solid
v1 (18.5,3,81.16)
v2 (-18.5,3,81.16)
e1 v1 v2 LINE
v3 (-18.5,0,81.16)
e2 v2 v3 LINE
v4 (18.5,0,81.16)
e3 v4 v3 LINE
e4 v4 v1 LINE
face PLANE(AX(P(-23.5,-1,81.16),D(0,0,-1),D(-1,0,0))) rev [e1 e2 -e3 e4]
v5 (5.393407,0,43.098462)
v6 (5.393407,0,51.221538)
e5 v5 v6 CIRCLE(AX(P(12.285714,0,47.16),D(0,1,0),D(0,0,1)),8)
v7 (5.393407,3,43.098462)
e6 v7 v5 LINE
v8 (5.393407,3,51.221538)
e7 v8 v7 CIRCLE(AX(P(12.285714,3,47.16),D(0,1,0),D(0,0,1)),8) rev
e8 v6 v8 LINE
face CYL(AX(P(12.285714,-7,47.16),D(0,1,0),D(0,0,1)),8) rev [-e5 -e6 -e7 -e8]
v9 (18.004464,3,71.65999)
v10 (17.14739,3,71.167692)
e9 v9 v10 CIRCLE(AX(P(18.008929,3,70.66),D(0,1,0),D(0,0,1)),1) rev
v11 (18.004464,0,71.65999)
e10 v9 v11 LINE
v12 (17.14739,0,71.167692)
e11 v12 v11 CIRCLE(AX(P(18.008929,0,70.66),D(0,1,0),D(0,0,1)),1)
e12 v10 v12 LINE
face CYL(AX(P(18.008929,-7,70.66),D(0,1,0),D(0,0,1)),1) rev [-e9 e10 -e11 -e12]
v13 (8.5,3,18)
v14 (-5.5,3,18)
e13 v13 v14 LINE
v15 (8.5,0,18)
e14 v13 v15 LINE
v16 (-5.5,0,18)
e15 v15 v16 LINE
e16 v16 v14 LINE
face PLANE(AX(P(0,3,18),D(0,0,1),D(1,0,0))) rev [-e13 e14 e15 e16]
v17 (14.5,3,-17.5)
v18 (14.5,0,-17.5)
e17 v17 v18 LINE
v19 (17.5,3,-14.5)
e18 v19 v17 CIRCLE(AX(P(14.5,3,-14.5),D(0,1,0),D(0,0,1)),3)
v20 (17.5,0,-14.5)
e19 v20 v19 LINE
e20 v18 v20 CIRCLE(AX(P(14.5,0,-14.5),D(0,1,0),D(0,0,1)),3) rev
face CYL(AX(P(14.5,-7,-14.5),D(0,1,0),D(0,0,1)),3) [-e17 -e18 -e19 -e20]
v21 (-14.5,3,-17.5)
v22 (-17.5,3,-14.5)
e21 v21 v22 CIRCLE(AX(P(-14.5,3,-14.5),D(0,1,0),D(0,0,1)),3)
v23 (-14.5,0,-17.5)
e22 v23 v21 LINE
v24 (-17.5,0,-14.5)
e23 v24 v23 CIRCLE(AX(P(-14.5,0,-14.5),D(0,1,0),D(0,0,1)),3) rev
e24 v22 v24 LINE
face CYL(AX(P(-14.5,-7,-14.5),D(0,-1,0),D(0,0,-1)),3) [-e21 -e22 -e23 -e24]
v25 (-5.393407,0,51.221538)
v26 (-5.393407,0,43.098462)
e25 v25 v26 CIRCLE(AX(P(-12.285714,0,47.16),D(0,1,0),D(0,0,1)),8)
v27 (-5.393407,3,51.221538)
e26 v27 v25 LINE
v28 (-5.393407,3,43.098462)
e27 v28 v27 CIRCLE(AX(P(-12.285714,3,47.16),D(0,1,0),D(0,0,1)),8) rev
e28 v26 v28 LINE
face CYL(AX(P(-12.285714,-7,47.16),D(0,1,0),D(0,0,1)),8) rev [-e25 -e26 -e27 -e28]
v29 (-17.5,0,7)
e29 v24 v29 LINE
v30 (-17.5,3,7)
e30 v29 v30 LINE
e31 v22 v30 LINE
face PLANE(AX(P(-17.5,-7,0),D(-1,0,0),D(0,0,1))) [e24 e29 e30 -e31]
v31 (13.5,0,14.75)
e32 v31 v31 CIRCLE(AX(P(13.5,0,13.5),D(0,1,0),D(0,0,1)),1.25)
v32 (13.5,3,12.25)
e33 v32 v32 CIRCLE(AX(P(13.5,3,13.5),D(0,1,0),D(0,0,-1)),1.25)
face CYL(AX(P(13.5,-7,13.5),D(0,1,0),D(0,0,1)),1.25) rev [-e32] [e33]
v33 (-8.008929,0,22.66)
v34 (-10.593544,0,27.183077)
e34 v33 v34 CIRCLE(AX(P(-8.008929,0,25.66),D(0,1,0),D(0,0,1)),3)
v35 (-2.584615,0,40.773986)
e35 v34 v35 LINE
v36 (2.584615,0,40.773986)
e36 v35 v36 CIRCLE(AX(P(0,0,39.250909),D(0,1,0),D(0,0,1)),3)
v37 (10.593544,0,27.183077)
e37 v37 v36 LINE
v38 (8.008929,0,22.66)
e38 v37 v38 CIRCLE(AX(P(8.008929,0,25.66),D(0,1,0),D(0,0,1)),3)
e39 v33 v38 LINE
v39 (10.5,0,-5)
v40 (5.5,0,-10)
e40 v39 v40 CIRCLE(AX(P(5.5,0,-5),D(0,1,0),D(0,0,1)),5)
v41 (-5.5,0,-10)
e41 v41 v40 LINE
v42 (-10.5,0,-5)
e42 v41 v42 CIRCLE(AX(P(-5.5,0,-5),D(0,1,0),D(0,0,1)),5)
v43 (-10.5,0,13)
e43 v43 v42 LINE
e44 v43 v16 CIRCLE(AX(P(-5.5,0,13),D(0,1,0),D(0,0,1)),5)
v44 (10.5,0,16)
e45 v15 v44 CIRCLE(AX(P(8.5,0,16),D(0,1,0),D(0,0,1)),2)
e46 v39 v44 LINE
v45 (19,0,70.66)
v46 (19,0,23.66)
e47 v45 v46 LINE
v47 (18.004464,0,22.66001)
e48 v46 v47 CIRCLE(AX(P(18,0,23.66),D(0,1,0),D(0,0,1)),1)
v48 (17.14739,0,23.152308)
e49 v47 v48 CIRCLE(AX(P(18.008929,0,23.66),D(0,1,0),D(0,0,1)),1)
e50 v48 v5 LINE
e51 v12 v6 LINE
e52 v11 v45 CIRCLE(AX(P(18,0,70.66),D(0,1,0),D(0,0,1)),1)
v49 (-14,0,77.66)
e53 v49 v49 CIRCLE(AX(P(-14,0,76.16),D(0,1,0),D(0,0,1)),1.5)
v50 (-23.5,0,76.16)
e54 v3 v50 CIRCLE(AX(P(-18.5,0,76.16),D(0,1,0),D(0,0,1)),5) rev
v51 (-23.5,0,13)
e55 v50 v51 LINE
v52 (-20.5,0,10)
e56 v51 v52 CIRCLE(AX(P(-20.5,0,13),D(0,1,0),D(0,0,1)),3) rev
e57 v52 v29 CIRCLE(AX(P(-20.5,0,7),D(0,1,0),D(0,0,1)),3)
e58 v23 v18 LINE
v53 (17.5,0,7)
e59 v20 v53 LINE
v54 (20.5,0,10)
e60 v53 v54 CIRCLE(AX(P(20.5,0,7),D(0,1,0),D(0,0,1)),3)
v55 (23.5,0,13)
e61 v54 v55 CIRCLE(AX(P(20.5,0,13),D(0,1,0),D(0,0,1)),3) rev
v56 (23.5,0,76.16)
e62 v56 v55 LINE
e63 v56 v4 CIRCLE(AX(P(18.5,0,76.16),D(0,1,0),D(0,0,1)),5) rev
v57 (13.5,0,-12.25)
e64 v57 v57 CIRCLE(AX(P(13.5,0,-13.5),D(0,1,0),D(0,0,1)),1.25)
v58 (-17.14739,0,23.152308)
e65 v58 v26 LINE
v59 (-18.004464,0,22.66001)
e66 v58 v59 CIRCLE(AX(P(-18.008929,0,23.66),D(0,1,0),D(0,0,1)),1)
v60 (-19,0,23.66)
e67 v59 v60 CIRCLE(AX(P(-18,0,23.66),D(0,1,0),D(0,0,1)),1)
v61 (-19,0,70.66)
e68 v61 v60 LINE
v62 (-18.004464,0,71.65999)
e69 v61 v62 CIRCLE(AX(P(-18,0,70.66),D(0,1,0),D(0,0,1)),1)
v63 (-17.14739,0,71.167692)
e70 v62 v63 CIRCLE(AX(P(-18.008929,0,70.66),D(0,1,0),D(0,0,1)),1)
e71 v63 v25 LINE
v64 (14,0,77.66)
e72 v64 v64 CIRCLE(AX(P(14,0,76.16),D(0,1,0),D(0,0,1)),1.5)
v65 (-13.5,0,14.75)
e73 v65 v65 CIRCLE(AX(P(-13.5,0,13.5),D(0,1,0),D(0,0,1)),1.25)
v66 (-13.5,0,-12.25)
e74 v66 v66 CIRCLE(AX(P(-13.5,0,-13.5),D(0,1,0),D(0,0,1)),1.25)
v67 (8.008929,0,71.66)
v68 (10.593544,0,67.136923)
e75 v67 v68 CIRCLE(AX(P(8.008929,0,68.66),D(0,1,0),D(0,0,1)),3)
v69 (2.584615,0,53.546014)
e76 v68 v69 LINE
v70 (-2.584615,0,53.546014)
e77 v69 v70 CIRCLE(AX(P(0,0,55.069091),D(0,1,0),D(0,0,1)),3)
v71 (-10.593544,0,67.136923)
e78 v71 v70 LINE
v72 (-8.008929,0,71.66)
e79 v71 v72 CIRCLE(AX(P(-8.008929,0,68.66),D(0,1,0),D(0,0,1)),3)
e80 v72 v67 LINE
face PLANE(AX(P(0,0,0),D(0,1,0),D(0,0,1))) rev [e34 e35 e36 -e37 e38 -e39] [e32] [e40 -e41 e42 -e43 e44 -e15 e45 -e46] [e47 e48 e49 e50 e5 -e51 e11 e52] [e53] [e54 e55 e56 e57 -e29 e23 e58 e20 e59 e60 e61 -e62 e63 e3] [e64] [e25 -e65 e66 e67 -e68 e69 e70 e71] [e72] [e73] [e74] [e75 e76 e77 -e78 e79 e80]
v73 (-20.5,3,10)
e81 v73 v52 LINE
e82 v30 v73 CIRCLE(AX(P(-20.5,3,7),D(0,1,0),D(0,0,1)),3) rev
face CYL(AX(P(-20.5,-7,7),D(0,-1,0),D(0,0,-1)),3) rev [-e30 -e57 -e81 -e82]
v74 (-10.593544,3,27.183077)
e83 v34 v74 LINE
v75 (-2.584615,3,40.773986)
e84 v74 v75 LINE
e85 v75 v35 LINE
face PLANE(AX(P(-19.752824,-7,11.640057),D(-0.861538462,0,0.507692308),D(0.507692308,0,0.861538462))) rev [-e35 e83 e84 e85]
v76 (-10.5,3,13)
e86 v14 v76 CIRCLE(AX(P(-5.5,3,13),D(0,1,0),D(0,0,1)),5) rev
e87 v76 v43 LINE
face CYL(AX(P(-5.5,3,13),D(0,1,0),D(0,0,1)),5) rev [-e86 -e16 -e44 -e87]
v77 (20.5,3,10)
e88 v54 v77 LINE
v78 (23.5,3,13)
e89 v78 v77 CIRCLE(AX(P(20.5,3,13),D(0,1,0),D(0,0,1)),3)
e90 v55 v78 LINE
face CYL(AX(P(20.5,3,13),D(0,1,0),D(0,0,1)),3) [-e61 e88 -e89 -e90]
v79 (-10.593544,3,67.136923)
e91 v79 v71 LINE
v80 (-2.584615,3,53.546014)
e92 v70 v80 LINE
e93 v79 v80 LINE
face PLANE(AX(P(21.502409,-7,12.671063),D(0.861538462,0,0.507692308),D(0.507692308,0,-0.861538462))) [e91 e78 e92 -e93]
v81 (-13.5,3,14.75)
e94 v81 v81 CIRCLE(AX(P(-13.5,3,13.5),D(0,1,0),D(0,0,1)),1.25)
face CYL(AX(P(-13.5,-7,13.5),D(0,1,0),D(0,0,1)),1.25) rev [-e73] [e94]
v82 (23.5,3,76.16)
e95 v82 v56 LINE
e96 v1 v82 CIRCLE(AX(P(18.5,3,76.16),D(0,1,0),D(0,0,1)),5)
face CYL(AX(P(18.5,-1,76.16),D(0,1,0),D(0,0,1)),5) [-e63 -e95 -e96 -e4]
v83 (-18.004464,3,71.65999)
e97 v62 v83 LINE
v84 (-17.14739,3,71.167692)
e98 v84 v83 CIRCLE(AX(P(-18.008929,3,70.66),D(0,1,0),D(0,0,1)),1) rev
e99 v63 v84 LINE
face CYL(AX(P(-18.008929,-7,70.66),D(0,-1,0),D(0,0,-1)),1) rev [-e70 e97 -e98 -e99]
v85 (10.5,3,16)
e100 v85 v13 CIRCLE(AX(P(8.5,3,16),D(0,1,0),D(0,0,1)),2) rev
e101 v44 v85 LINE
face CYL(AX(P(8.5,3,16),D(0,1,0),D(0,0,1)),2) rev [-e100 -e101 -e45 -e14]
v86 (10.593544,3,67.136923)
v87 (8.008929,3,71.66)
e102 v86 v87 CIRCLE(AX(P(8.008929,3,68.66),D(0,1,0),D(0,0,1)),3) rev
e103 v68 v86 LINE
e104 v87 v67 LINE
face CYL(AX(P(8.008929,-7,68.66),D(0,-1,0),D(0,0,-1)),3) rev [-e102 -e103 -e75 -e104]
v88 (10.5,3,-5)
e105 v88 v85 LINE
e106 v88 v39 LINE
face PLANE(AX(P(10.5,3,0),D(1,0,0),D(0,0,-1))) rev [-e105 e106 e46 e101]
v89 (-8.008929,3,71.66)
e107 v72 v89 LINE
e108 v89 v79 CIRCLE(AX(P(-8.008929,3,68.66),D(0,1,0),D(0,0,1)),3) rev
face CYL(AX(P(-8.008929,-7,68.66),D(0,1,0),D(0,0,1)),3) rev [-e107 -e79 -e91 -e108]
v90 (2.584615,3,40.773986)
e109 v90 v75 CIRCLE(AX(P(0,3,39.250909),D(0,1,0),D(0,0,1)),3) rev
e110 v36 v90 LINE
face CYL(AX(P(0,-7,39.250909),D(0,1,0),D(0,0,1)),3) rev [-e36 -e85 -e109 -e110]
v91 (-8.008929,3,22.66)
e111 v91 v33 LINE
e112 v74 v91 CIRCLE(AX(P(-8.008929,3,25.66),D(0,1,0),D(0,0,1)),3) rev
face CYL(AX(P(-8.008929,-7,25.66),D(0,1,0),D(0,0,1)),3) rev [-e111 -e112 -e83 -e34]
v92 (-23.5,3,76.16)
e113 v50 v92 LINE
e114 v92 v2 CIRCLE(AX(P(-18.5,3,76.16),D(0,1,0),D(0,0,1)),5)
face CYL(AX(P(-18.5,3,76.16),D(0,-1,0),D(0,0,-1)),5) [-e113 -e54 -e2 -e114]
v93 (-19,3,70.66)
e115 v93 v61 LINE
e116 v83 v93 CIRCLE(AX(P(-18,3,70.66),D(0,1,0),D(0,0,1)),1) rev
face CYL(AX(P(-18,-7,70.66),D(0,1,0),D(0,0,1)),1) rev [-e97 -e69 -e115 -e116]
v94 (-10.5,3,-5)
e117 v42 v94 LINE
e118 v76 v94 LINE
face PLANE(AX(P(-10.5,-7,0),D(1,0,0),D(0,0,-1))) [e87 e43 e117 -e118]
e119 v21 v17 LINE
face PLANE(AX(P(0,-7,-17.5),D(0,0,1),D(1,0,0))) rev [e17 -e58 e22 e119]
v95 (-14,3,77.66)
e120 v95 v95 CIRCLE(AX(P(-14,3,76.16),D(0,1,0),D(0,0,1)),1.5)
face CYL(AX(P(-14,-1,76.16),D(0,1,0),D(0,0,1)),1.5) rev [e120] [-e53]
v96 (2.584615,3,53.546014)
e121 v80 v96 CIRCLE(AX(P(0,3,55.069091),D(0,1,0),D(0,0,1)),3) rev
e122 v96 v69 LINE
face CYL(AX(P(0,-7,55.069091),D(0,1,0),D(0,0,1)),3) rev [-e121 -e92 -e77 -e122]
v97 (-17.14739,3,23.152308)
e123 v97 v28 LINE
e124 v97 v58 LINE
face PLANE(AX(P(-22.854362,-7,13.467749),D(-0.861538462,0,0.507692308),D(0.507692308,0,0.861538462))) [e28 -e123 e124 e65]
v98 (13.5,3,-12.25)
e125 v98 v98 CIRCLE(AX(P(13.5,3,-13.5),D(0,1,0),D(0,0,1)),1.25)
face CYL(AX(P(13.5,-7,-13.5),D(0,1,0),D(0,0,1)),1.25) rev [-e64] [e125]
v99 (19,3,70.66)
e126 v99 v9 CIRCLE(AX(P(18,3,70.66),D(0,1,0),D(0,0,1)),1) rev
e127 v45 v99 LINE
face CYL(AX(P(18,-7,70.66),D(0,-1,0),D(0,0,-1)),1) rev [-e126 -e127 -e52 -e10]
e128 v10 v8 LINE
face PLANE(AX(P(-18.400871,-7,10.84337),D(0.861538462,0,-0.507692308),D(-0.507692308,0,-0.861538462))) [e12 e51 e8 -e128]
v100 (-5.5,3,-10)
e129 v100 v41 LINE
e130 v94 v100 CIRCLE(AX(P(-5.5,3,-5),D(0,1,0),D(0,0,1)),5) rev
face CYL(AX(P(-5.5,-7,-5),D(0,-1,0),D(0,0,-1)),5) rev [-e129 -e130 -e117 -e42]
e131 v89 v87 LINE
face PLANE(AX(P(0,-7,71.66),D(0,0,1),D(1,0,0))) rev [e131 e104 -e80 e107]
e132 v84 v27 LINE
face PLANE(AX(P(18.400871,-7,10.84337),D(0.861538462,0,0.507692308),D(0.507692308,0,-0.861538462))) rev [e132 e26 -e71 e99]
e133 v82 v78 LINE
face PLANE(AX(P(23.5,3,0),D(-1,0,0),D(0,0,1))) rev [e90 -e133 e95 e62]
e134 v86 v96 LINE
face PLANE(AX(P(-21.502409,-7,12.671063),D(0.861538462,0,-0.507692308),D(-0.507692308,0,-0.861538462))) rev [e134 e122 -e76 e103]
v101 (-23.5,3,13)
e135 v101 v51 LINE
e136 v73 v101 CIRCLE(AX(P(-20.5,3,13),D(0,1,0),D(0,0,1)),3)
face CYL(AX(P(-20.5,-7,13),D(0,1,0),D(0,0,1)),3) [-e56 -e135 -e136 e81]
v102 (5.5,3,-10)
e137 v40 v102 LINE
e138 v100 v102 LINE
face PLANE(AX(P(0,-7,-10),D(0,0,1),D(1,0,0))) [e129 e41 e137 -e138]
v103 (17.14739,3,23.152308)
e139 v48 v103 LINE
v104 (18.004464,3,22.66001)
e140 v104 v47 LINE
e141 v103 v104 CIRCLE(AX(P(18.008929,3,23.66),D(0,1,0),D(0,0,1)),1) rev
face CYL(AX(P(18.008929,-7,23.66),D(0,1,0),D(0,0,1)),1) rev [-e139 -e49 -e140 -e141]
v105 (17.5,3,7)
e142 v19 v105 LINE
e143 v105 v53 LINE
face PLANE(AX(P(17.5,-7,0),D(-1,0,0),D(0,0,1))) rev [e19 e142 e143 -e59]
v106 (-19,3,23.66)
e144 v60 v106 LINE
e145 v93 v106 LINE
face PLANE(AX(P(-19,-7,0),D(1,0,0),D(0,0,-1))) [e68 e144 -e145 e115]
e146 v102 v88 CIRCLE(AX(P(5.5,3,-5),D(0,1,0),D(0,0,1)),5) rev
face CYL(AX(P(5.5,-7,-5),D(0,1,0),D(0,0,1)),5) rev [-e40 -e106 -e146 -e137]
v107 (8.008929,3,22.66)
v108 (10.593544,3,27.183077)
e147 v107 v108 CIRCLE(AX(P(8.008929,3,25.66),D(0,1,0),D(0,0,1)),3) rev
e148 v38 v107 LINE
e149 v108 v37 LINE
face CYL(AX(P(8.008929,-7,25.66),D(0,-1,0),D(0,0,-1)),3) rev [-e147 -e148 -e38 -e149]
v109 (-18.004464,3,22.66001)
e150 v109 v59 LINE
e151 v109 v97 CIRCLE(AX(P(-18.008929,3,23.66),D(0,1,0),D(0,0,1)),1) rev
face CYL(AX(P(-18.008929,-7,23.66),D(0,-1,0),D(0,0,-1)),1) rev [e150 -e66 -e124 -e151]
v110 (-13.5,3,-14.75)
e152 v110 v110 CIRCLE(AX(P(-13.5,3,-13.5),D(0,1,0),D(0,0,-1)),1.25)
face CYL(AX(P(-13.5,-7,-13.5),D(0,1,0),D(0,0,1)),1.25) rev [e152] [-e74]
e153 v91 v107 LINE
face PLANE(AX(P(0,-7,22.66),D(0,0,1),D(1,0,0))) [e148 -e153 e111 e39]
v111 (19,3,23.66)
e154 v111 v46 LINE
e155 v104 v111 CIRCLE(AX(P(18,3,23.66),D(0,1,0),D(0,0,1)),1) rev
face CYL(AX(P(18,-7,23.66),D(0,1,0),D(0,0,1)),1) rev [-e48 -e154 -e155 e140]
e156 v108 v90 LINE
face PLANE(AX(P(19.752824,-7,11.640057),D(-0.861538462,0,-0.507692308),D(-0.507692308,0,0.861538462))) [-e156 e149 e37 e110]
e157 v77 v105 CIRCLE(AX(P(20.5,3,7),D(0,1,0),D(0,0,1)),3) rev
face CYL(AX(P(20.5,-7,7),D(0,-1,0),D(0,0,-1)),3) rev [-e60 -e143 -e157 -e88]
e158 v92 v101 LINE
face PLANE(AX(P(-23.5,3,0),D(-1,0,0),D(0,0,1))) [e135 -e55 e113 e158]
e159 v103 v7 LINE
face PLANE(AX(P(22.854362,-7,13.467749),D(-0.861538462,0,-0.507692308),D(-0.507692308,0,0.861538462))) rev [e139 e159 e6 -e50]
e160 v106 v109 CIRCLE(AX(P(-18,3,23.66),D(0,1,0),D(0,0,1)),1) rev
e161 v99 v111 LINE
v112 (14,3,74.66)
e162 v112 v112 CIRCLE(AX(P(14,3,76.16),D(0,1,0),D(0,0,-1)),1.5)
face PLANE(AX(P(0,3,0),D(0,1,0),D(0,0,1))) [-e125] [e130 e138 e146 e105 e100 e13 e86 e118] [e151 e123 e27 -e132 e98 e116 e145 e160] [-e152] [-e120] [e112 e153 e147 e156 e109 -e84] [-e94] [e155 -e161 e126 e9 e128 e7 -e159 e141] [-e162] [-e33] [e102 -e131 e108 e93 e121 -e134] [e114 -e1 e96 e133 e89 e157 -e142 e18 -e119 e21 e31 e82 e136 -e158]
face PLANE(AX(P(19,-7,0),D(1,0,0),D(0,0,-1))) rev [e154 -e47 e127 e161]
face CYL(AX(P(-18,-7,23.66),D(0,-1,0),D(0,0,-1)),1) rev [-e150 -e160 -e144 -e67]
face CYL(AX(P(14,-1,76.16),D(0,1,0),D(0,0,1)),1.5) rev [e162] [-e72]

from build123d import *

# Parameters (mm, degrees)
SKETCH_1_W          = 47
SKETCH_1_H          = 106.16
SKETCH_1_W_2        = 10.5
SKETCH_1_H_2        = 10
EXTRUDE_1_DEPTH     = 3
SKETCH_4_R          = 1.5
SKETCH_4_W          = 47
SKETCH_4_H          = 5
CUT_EXTRUDE_2_DEPTH = 4
SKETCH_10_R         = 1.25
CUT_EXTRUDE_4_DEPTH = 10
SKETCH_16_W         = 17.5
SKETCH_16_H         = 2.5
CUT_EXTRUDE_5_DEPTH = 10
FILLET_1_R          = 3
CUT_EXTRUDE_7_DEPTH = 10
FILLET_2_R          = 1
FILLET_3_R          = 8
FILLET_4_R          = 3
FILLET_5_R          = 5
SKETCH_17_W         = 21
SKETCH_17_H         = 20
SKETCH_17_H_2       = 8
CUT_EXTRUDE_8_DEPTH = 10
FILLET_6_R          = 5
FILLET_7_R          = 2


# Some blends are built 0.0001 mm under size
with BuildPart() as part:
    # 草图1 → 凸台-拉伸1 (new body)
    with BuildSketch(Plane(origin=(0, 0, 0), x_dir=(1, 0, 0), z_dir=(0, 1, 0))):
        with Locations((0, -33.08)):
            Rectangle(SKETCH_1_W, SKETCH_1_H)
        with Locations((5.25, -13)):
            Rectangle(SKETCH_1_W_2, SKETCH_1_H_2, mode=Mode.SUBTRACT)
    extrude(amount=EXTRUDE_1_DEPTH)

    # 草图4 → 切除-拉伸2 (cut)
    with BuildSketch(Plane(origin=(0, 3, 0), x_dir=(1, 0, 0), z_dir=(0, 1, 0))):
        with Locations(Location((-14, -76.16, 0), (0, 0, 270))):
            Circle(SKETCH_4_R)
        with Locations(Location((14, -76.16, 0), (0, 0, 270))):
            Circle(SKETCH_4_R)
        with Locations((0, -83.66)):
            Rectangle(SKETCH_4_W, SKETCH_4_H)
    extrude(amount=-CUT_EXTRUDE_2_DEPTH, mode=Mode.SUBTRACT)

    # 草图10 → 切除-拉伸4 (cut)
    with BuildSketch(Plane(origin=(0, 3, 0), x_dir=(1, 0, 0), z_dir=(0, 1, 0))):
        with Locations(Location((13.5, 13.5, 0), (0, 0, 270))):
            Circle(SKETCH_10_R)
        with Locations(Location((13.5, -13.5, 0), (0, 0, 270))):
            Circle(SKETCH_10_R)
        with Locations(Location((-13.5, -13.5, 0), (0, 0, 270))):
            Circle(SKETCH_10_R)
        with Locations(Location((-13.5, 13.5, 0), (0, 0, 270))):
            Circle(SKETCH_10_R)
    extrude(amount=-CUT_EXTRUDE_4_DEPTH, mode=Mode.SUBTRACT)

    # 草图16 → 切除-拉伸5 (cut)
    with BuildSketch(Plane(origin=(0, 3, 0), x_dir=(1, 0, 0), z_dir=(0, 1, 0))):
        Polygon((-17.5, 17.5), (-17.5, 20), (-23.5, 20), (-23.5, -10), (-17.5, -10), align=None)
        Polygon((23.5, 20), (17.5, 20), (17.5, 17.5), (17.5, -10), (23.5, -10), align=None)
        with Locations((8.75, 18.75)):
            Rectangle(SKETCH_16_W, SKETCH_16_H)
        with Locations((-8.75, 18.75)):
            Rectangle(SKETCH_16_W, SKETCH_16_H)
    extrude(amount=-CUT_EXTRUDE_5_DEPTH, mode=Mode.SUBTRACT)

    # 圆角1
    fillet_1_edges = [part.edges().sort_by_distance(p)[0] for p in [
        (-17.5, 1.5, -17.5),
        (17.5, 1.5, -17.5),
        (23.5, 1.5, 10),
        (-23.5, 1.5, 10),
        (17.5, 1.5, 10),
        (-17.5, 1.5, 10),
    ]]
    fillet(fillet_1_edges, radius=FILLET_1_R - 0.0001)  # a hair under: the kernel refuses the full size

    # 草图9 → 切除-拉伸7 (cut)
    with BuildSketch(Plane(origin=(0, 3, 0), x_dir=(1, 0, 0), z_dir=(0, 1, 0))):
        Polygon((-3, -47.16), (-17.4375, -22.66), (-19, -22.66), (-19, -71.66), (-17.4375, -71.66), align=None)
        Polygon((0, -45.16), (13.258928571, -22.66), (-13.258928571, -22.66), align=None)
        Polygon((19, -22.66), (17.4375, -22.66), (3, -47.16), (17.4375, -71.66), (19, -71.66), align=None)
        Polygon((-13.258928571, -71.66), (13.258928571, -71.66), (0, -49.16), align=None)
    extrude(amount=-CUT_EXTRUDE_7_DEPTH, mode=Mode.SUBTRACT)

    # 圆角2
    # the kernel refuses this fillet: 1 mm, written as the material it adds along each edge
    with BuildSketch(Plane(origin=(-17.4375, 3, 71.66), x_dir=(-1, 0, 0), z_dir=(0, -1, 0)), Plane(origin=(17.4375, 3, 71.66), x_dir=(-0.507692307692314, 0, -0.8615384615384579), z_dir=(0, -1, 0)), Plane(origin=(17.4375, 3, 22.66), x_dir=(1, 0, 0), z_dir=(0, -1, 0)), Plane(origin=(-17.4375, 3, 22.66), x_dir=(0.5076923076923058, 0, 0.8615384615384627), z_dir=(0, -1, 0))) as fillet_2_piece_1:
        with BuildLine():
            CenterArc((FILLET_2_R * 0.571428571429, FILLET_2_R), FILLET_2_R, 210.510237406, 59.489762594)
            Line((-FILLET_2_R * 0.29010989011, FILLET_2_R * 0.492307692308), (0, 0))
            Line((0, 0), (FILLET_2_R * 0.571428571429, 0))
        make_face()
    extrude(amount=3)
    with BuildSketch(Plane(origin=(-19, 3, 71.66), x_dir=(0, 0, -1), z_dir=(0, -1, 0)), Plane(origin=(19, 3, 71.66), x_dir=(-1, 0, 0), z_dir=(0, -1, 0)), Plane(origin=(-19, 3, 22.66), x_dir=(1, 0, 0), z_dir=(0, -1, 0))) as fillet_2_piece_2:
        with BuildLine():
            CenterArc((FILLET_2_R, FILLET_2_R), FILLET_2_R, 180, 90)
            Line((0, FILLET_2_R), (0, 0))
            Line((0, 0), (FILLET_2_R, 0))
        make_face()
    extrude(amount=3)
    with BuildSketch(Plane(origin=(19, 3, 22.66), x_dir=(-1, 0, 0), z_dir=(0, -1, 0))) as fillet_2_piece_3:
        with BuildLine():
            CenterArc((FILLET_2_R, -FILLET_2_R), FILLET_2_R, 90, 90)
            Line((0, -FILLET_2_R), (0, 0))
            Line((0, 0), (FILLET_2_R, 0))
        make_face()
    extrude(amount=3)

    # 圆角3
    fillet_3_edges = [part.edges().sort_by_distance(p)[0] for p in [
        (3, 1.5, 47.16),
        (-3, 1.5, 47.16),
    ]]
    fillet(fillet_3_edges, radius=FILLET_3_R)

    # 圆角4
    fillet_4_edges = [part.edges().sort_by_distance(p)[0] for p in [
        (-13.258928571, 1.5, 22.66),
        (13.258928571, 1.5, 22.66),
        (0, 1.5, 45.16),
        (-13.258928571, 1.5, 71.66),
        (0, 1.5, 49.16),
        (13.258928571, 1.5, 71.66),
    ]]
    fillet(fillet_4_edges, radius=FILLET_4_R)

    # 圆角5
    fillet_5_edges = [part.edges().sort_by_distance(p)[0] for p in [
        (-23.5, 1.5, 81.16),
        (23.5, 1.5, 81.16),
    ]]
    fillet(fillet_5_edges, radius=FILLET_5_R)

    # 草图17 → 切除-拉伸8 (cut)
    with BuildSketch(Plane(origin=(0, 3, 0), x_dir=(1, 0, 0), z_dir=(0, 1, 0))):
        Rectangle(SKETCH_17_W, SKETCH_17_H)
        with Locations((0, -14)):
            Rectangle(SKETCH_17_W, SKETCH_17_H_2)
    extrude(amount=-CUT_EXTRUDE_8_DEPTH, mode=Mode.SUBTRACT)

    # 圆角6
    fillet_6_edges = [part.edges().sort_by_distance(p)[0] for p in [
        (-10.5, 1.5, 18),
        (-10.5, 1.5, -10),
        (10.5, 1.5, -10),
    ]]
    fillet(fillet_6_edges, radius=FILLET_6_R)

    # 圆角7
    fillet_7_edges = [part.edges().sort_by_distance(p)[0] for p in [
        (10.5, 1.5, 18),
    ]]
    fillet(fillet_7_edges, radius=FILLET_7_R)


solid = part.part
